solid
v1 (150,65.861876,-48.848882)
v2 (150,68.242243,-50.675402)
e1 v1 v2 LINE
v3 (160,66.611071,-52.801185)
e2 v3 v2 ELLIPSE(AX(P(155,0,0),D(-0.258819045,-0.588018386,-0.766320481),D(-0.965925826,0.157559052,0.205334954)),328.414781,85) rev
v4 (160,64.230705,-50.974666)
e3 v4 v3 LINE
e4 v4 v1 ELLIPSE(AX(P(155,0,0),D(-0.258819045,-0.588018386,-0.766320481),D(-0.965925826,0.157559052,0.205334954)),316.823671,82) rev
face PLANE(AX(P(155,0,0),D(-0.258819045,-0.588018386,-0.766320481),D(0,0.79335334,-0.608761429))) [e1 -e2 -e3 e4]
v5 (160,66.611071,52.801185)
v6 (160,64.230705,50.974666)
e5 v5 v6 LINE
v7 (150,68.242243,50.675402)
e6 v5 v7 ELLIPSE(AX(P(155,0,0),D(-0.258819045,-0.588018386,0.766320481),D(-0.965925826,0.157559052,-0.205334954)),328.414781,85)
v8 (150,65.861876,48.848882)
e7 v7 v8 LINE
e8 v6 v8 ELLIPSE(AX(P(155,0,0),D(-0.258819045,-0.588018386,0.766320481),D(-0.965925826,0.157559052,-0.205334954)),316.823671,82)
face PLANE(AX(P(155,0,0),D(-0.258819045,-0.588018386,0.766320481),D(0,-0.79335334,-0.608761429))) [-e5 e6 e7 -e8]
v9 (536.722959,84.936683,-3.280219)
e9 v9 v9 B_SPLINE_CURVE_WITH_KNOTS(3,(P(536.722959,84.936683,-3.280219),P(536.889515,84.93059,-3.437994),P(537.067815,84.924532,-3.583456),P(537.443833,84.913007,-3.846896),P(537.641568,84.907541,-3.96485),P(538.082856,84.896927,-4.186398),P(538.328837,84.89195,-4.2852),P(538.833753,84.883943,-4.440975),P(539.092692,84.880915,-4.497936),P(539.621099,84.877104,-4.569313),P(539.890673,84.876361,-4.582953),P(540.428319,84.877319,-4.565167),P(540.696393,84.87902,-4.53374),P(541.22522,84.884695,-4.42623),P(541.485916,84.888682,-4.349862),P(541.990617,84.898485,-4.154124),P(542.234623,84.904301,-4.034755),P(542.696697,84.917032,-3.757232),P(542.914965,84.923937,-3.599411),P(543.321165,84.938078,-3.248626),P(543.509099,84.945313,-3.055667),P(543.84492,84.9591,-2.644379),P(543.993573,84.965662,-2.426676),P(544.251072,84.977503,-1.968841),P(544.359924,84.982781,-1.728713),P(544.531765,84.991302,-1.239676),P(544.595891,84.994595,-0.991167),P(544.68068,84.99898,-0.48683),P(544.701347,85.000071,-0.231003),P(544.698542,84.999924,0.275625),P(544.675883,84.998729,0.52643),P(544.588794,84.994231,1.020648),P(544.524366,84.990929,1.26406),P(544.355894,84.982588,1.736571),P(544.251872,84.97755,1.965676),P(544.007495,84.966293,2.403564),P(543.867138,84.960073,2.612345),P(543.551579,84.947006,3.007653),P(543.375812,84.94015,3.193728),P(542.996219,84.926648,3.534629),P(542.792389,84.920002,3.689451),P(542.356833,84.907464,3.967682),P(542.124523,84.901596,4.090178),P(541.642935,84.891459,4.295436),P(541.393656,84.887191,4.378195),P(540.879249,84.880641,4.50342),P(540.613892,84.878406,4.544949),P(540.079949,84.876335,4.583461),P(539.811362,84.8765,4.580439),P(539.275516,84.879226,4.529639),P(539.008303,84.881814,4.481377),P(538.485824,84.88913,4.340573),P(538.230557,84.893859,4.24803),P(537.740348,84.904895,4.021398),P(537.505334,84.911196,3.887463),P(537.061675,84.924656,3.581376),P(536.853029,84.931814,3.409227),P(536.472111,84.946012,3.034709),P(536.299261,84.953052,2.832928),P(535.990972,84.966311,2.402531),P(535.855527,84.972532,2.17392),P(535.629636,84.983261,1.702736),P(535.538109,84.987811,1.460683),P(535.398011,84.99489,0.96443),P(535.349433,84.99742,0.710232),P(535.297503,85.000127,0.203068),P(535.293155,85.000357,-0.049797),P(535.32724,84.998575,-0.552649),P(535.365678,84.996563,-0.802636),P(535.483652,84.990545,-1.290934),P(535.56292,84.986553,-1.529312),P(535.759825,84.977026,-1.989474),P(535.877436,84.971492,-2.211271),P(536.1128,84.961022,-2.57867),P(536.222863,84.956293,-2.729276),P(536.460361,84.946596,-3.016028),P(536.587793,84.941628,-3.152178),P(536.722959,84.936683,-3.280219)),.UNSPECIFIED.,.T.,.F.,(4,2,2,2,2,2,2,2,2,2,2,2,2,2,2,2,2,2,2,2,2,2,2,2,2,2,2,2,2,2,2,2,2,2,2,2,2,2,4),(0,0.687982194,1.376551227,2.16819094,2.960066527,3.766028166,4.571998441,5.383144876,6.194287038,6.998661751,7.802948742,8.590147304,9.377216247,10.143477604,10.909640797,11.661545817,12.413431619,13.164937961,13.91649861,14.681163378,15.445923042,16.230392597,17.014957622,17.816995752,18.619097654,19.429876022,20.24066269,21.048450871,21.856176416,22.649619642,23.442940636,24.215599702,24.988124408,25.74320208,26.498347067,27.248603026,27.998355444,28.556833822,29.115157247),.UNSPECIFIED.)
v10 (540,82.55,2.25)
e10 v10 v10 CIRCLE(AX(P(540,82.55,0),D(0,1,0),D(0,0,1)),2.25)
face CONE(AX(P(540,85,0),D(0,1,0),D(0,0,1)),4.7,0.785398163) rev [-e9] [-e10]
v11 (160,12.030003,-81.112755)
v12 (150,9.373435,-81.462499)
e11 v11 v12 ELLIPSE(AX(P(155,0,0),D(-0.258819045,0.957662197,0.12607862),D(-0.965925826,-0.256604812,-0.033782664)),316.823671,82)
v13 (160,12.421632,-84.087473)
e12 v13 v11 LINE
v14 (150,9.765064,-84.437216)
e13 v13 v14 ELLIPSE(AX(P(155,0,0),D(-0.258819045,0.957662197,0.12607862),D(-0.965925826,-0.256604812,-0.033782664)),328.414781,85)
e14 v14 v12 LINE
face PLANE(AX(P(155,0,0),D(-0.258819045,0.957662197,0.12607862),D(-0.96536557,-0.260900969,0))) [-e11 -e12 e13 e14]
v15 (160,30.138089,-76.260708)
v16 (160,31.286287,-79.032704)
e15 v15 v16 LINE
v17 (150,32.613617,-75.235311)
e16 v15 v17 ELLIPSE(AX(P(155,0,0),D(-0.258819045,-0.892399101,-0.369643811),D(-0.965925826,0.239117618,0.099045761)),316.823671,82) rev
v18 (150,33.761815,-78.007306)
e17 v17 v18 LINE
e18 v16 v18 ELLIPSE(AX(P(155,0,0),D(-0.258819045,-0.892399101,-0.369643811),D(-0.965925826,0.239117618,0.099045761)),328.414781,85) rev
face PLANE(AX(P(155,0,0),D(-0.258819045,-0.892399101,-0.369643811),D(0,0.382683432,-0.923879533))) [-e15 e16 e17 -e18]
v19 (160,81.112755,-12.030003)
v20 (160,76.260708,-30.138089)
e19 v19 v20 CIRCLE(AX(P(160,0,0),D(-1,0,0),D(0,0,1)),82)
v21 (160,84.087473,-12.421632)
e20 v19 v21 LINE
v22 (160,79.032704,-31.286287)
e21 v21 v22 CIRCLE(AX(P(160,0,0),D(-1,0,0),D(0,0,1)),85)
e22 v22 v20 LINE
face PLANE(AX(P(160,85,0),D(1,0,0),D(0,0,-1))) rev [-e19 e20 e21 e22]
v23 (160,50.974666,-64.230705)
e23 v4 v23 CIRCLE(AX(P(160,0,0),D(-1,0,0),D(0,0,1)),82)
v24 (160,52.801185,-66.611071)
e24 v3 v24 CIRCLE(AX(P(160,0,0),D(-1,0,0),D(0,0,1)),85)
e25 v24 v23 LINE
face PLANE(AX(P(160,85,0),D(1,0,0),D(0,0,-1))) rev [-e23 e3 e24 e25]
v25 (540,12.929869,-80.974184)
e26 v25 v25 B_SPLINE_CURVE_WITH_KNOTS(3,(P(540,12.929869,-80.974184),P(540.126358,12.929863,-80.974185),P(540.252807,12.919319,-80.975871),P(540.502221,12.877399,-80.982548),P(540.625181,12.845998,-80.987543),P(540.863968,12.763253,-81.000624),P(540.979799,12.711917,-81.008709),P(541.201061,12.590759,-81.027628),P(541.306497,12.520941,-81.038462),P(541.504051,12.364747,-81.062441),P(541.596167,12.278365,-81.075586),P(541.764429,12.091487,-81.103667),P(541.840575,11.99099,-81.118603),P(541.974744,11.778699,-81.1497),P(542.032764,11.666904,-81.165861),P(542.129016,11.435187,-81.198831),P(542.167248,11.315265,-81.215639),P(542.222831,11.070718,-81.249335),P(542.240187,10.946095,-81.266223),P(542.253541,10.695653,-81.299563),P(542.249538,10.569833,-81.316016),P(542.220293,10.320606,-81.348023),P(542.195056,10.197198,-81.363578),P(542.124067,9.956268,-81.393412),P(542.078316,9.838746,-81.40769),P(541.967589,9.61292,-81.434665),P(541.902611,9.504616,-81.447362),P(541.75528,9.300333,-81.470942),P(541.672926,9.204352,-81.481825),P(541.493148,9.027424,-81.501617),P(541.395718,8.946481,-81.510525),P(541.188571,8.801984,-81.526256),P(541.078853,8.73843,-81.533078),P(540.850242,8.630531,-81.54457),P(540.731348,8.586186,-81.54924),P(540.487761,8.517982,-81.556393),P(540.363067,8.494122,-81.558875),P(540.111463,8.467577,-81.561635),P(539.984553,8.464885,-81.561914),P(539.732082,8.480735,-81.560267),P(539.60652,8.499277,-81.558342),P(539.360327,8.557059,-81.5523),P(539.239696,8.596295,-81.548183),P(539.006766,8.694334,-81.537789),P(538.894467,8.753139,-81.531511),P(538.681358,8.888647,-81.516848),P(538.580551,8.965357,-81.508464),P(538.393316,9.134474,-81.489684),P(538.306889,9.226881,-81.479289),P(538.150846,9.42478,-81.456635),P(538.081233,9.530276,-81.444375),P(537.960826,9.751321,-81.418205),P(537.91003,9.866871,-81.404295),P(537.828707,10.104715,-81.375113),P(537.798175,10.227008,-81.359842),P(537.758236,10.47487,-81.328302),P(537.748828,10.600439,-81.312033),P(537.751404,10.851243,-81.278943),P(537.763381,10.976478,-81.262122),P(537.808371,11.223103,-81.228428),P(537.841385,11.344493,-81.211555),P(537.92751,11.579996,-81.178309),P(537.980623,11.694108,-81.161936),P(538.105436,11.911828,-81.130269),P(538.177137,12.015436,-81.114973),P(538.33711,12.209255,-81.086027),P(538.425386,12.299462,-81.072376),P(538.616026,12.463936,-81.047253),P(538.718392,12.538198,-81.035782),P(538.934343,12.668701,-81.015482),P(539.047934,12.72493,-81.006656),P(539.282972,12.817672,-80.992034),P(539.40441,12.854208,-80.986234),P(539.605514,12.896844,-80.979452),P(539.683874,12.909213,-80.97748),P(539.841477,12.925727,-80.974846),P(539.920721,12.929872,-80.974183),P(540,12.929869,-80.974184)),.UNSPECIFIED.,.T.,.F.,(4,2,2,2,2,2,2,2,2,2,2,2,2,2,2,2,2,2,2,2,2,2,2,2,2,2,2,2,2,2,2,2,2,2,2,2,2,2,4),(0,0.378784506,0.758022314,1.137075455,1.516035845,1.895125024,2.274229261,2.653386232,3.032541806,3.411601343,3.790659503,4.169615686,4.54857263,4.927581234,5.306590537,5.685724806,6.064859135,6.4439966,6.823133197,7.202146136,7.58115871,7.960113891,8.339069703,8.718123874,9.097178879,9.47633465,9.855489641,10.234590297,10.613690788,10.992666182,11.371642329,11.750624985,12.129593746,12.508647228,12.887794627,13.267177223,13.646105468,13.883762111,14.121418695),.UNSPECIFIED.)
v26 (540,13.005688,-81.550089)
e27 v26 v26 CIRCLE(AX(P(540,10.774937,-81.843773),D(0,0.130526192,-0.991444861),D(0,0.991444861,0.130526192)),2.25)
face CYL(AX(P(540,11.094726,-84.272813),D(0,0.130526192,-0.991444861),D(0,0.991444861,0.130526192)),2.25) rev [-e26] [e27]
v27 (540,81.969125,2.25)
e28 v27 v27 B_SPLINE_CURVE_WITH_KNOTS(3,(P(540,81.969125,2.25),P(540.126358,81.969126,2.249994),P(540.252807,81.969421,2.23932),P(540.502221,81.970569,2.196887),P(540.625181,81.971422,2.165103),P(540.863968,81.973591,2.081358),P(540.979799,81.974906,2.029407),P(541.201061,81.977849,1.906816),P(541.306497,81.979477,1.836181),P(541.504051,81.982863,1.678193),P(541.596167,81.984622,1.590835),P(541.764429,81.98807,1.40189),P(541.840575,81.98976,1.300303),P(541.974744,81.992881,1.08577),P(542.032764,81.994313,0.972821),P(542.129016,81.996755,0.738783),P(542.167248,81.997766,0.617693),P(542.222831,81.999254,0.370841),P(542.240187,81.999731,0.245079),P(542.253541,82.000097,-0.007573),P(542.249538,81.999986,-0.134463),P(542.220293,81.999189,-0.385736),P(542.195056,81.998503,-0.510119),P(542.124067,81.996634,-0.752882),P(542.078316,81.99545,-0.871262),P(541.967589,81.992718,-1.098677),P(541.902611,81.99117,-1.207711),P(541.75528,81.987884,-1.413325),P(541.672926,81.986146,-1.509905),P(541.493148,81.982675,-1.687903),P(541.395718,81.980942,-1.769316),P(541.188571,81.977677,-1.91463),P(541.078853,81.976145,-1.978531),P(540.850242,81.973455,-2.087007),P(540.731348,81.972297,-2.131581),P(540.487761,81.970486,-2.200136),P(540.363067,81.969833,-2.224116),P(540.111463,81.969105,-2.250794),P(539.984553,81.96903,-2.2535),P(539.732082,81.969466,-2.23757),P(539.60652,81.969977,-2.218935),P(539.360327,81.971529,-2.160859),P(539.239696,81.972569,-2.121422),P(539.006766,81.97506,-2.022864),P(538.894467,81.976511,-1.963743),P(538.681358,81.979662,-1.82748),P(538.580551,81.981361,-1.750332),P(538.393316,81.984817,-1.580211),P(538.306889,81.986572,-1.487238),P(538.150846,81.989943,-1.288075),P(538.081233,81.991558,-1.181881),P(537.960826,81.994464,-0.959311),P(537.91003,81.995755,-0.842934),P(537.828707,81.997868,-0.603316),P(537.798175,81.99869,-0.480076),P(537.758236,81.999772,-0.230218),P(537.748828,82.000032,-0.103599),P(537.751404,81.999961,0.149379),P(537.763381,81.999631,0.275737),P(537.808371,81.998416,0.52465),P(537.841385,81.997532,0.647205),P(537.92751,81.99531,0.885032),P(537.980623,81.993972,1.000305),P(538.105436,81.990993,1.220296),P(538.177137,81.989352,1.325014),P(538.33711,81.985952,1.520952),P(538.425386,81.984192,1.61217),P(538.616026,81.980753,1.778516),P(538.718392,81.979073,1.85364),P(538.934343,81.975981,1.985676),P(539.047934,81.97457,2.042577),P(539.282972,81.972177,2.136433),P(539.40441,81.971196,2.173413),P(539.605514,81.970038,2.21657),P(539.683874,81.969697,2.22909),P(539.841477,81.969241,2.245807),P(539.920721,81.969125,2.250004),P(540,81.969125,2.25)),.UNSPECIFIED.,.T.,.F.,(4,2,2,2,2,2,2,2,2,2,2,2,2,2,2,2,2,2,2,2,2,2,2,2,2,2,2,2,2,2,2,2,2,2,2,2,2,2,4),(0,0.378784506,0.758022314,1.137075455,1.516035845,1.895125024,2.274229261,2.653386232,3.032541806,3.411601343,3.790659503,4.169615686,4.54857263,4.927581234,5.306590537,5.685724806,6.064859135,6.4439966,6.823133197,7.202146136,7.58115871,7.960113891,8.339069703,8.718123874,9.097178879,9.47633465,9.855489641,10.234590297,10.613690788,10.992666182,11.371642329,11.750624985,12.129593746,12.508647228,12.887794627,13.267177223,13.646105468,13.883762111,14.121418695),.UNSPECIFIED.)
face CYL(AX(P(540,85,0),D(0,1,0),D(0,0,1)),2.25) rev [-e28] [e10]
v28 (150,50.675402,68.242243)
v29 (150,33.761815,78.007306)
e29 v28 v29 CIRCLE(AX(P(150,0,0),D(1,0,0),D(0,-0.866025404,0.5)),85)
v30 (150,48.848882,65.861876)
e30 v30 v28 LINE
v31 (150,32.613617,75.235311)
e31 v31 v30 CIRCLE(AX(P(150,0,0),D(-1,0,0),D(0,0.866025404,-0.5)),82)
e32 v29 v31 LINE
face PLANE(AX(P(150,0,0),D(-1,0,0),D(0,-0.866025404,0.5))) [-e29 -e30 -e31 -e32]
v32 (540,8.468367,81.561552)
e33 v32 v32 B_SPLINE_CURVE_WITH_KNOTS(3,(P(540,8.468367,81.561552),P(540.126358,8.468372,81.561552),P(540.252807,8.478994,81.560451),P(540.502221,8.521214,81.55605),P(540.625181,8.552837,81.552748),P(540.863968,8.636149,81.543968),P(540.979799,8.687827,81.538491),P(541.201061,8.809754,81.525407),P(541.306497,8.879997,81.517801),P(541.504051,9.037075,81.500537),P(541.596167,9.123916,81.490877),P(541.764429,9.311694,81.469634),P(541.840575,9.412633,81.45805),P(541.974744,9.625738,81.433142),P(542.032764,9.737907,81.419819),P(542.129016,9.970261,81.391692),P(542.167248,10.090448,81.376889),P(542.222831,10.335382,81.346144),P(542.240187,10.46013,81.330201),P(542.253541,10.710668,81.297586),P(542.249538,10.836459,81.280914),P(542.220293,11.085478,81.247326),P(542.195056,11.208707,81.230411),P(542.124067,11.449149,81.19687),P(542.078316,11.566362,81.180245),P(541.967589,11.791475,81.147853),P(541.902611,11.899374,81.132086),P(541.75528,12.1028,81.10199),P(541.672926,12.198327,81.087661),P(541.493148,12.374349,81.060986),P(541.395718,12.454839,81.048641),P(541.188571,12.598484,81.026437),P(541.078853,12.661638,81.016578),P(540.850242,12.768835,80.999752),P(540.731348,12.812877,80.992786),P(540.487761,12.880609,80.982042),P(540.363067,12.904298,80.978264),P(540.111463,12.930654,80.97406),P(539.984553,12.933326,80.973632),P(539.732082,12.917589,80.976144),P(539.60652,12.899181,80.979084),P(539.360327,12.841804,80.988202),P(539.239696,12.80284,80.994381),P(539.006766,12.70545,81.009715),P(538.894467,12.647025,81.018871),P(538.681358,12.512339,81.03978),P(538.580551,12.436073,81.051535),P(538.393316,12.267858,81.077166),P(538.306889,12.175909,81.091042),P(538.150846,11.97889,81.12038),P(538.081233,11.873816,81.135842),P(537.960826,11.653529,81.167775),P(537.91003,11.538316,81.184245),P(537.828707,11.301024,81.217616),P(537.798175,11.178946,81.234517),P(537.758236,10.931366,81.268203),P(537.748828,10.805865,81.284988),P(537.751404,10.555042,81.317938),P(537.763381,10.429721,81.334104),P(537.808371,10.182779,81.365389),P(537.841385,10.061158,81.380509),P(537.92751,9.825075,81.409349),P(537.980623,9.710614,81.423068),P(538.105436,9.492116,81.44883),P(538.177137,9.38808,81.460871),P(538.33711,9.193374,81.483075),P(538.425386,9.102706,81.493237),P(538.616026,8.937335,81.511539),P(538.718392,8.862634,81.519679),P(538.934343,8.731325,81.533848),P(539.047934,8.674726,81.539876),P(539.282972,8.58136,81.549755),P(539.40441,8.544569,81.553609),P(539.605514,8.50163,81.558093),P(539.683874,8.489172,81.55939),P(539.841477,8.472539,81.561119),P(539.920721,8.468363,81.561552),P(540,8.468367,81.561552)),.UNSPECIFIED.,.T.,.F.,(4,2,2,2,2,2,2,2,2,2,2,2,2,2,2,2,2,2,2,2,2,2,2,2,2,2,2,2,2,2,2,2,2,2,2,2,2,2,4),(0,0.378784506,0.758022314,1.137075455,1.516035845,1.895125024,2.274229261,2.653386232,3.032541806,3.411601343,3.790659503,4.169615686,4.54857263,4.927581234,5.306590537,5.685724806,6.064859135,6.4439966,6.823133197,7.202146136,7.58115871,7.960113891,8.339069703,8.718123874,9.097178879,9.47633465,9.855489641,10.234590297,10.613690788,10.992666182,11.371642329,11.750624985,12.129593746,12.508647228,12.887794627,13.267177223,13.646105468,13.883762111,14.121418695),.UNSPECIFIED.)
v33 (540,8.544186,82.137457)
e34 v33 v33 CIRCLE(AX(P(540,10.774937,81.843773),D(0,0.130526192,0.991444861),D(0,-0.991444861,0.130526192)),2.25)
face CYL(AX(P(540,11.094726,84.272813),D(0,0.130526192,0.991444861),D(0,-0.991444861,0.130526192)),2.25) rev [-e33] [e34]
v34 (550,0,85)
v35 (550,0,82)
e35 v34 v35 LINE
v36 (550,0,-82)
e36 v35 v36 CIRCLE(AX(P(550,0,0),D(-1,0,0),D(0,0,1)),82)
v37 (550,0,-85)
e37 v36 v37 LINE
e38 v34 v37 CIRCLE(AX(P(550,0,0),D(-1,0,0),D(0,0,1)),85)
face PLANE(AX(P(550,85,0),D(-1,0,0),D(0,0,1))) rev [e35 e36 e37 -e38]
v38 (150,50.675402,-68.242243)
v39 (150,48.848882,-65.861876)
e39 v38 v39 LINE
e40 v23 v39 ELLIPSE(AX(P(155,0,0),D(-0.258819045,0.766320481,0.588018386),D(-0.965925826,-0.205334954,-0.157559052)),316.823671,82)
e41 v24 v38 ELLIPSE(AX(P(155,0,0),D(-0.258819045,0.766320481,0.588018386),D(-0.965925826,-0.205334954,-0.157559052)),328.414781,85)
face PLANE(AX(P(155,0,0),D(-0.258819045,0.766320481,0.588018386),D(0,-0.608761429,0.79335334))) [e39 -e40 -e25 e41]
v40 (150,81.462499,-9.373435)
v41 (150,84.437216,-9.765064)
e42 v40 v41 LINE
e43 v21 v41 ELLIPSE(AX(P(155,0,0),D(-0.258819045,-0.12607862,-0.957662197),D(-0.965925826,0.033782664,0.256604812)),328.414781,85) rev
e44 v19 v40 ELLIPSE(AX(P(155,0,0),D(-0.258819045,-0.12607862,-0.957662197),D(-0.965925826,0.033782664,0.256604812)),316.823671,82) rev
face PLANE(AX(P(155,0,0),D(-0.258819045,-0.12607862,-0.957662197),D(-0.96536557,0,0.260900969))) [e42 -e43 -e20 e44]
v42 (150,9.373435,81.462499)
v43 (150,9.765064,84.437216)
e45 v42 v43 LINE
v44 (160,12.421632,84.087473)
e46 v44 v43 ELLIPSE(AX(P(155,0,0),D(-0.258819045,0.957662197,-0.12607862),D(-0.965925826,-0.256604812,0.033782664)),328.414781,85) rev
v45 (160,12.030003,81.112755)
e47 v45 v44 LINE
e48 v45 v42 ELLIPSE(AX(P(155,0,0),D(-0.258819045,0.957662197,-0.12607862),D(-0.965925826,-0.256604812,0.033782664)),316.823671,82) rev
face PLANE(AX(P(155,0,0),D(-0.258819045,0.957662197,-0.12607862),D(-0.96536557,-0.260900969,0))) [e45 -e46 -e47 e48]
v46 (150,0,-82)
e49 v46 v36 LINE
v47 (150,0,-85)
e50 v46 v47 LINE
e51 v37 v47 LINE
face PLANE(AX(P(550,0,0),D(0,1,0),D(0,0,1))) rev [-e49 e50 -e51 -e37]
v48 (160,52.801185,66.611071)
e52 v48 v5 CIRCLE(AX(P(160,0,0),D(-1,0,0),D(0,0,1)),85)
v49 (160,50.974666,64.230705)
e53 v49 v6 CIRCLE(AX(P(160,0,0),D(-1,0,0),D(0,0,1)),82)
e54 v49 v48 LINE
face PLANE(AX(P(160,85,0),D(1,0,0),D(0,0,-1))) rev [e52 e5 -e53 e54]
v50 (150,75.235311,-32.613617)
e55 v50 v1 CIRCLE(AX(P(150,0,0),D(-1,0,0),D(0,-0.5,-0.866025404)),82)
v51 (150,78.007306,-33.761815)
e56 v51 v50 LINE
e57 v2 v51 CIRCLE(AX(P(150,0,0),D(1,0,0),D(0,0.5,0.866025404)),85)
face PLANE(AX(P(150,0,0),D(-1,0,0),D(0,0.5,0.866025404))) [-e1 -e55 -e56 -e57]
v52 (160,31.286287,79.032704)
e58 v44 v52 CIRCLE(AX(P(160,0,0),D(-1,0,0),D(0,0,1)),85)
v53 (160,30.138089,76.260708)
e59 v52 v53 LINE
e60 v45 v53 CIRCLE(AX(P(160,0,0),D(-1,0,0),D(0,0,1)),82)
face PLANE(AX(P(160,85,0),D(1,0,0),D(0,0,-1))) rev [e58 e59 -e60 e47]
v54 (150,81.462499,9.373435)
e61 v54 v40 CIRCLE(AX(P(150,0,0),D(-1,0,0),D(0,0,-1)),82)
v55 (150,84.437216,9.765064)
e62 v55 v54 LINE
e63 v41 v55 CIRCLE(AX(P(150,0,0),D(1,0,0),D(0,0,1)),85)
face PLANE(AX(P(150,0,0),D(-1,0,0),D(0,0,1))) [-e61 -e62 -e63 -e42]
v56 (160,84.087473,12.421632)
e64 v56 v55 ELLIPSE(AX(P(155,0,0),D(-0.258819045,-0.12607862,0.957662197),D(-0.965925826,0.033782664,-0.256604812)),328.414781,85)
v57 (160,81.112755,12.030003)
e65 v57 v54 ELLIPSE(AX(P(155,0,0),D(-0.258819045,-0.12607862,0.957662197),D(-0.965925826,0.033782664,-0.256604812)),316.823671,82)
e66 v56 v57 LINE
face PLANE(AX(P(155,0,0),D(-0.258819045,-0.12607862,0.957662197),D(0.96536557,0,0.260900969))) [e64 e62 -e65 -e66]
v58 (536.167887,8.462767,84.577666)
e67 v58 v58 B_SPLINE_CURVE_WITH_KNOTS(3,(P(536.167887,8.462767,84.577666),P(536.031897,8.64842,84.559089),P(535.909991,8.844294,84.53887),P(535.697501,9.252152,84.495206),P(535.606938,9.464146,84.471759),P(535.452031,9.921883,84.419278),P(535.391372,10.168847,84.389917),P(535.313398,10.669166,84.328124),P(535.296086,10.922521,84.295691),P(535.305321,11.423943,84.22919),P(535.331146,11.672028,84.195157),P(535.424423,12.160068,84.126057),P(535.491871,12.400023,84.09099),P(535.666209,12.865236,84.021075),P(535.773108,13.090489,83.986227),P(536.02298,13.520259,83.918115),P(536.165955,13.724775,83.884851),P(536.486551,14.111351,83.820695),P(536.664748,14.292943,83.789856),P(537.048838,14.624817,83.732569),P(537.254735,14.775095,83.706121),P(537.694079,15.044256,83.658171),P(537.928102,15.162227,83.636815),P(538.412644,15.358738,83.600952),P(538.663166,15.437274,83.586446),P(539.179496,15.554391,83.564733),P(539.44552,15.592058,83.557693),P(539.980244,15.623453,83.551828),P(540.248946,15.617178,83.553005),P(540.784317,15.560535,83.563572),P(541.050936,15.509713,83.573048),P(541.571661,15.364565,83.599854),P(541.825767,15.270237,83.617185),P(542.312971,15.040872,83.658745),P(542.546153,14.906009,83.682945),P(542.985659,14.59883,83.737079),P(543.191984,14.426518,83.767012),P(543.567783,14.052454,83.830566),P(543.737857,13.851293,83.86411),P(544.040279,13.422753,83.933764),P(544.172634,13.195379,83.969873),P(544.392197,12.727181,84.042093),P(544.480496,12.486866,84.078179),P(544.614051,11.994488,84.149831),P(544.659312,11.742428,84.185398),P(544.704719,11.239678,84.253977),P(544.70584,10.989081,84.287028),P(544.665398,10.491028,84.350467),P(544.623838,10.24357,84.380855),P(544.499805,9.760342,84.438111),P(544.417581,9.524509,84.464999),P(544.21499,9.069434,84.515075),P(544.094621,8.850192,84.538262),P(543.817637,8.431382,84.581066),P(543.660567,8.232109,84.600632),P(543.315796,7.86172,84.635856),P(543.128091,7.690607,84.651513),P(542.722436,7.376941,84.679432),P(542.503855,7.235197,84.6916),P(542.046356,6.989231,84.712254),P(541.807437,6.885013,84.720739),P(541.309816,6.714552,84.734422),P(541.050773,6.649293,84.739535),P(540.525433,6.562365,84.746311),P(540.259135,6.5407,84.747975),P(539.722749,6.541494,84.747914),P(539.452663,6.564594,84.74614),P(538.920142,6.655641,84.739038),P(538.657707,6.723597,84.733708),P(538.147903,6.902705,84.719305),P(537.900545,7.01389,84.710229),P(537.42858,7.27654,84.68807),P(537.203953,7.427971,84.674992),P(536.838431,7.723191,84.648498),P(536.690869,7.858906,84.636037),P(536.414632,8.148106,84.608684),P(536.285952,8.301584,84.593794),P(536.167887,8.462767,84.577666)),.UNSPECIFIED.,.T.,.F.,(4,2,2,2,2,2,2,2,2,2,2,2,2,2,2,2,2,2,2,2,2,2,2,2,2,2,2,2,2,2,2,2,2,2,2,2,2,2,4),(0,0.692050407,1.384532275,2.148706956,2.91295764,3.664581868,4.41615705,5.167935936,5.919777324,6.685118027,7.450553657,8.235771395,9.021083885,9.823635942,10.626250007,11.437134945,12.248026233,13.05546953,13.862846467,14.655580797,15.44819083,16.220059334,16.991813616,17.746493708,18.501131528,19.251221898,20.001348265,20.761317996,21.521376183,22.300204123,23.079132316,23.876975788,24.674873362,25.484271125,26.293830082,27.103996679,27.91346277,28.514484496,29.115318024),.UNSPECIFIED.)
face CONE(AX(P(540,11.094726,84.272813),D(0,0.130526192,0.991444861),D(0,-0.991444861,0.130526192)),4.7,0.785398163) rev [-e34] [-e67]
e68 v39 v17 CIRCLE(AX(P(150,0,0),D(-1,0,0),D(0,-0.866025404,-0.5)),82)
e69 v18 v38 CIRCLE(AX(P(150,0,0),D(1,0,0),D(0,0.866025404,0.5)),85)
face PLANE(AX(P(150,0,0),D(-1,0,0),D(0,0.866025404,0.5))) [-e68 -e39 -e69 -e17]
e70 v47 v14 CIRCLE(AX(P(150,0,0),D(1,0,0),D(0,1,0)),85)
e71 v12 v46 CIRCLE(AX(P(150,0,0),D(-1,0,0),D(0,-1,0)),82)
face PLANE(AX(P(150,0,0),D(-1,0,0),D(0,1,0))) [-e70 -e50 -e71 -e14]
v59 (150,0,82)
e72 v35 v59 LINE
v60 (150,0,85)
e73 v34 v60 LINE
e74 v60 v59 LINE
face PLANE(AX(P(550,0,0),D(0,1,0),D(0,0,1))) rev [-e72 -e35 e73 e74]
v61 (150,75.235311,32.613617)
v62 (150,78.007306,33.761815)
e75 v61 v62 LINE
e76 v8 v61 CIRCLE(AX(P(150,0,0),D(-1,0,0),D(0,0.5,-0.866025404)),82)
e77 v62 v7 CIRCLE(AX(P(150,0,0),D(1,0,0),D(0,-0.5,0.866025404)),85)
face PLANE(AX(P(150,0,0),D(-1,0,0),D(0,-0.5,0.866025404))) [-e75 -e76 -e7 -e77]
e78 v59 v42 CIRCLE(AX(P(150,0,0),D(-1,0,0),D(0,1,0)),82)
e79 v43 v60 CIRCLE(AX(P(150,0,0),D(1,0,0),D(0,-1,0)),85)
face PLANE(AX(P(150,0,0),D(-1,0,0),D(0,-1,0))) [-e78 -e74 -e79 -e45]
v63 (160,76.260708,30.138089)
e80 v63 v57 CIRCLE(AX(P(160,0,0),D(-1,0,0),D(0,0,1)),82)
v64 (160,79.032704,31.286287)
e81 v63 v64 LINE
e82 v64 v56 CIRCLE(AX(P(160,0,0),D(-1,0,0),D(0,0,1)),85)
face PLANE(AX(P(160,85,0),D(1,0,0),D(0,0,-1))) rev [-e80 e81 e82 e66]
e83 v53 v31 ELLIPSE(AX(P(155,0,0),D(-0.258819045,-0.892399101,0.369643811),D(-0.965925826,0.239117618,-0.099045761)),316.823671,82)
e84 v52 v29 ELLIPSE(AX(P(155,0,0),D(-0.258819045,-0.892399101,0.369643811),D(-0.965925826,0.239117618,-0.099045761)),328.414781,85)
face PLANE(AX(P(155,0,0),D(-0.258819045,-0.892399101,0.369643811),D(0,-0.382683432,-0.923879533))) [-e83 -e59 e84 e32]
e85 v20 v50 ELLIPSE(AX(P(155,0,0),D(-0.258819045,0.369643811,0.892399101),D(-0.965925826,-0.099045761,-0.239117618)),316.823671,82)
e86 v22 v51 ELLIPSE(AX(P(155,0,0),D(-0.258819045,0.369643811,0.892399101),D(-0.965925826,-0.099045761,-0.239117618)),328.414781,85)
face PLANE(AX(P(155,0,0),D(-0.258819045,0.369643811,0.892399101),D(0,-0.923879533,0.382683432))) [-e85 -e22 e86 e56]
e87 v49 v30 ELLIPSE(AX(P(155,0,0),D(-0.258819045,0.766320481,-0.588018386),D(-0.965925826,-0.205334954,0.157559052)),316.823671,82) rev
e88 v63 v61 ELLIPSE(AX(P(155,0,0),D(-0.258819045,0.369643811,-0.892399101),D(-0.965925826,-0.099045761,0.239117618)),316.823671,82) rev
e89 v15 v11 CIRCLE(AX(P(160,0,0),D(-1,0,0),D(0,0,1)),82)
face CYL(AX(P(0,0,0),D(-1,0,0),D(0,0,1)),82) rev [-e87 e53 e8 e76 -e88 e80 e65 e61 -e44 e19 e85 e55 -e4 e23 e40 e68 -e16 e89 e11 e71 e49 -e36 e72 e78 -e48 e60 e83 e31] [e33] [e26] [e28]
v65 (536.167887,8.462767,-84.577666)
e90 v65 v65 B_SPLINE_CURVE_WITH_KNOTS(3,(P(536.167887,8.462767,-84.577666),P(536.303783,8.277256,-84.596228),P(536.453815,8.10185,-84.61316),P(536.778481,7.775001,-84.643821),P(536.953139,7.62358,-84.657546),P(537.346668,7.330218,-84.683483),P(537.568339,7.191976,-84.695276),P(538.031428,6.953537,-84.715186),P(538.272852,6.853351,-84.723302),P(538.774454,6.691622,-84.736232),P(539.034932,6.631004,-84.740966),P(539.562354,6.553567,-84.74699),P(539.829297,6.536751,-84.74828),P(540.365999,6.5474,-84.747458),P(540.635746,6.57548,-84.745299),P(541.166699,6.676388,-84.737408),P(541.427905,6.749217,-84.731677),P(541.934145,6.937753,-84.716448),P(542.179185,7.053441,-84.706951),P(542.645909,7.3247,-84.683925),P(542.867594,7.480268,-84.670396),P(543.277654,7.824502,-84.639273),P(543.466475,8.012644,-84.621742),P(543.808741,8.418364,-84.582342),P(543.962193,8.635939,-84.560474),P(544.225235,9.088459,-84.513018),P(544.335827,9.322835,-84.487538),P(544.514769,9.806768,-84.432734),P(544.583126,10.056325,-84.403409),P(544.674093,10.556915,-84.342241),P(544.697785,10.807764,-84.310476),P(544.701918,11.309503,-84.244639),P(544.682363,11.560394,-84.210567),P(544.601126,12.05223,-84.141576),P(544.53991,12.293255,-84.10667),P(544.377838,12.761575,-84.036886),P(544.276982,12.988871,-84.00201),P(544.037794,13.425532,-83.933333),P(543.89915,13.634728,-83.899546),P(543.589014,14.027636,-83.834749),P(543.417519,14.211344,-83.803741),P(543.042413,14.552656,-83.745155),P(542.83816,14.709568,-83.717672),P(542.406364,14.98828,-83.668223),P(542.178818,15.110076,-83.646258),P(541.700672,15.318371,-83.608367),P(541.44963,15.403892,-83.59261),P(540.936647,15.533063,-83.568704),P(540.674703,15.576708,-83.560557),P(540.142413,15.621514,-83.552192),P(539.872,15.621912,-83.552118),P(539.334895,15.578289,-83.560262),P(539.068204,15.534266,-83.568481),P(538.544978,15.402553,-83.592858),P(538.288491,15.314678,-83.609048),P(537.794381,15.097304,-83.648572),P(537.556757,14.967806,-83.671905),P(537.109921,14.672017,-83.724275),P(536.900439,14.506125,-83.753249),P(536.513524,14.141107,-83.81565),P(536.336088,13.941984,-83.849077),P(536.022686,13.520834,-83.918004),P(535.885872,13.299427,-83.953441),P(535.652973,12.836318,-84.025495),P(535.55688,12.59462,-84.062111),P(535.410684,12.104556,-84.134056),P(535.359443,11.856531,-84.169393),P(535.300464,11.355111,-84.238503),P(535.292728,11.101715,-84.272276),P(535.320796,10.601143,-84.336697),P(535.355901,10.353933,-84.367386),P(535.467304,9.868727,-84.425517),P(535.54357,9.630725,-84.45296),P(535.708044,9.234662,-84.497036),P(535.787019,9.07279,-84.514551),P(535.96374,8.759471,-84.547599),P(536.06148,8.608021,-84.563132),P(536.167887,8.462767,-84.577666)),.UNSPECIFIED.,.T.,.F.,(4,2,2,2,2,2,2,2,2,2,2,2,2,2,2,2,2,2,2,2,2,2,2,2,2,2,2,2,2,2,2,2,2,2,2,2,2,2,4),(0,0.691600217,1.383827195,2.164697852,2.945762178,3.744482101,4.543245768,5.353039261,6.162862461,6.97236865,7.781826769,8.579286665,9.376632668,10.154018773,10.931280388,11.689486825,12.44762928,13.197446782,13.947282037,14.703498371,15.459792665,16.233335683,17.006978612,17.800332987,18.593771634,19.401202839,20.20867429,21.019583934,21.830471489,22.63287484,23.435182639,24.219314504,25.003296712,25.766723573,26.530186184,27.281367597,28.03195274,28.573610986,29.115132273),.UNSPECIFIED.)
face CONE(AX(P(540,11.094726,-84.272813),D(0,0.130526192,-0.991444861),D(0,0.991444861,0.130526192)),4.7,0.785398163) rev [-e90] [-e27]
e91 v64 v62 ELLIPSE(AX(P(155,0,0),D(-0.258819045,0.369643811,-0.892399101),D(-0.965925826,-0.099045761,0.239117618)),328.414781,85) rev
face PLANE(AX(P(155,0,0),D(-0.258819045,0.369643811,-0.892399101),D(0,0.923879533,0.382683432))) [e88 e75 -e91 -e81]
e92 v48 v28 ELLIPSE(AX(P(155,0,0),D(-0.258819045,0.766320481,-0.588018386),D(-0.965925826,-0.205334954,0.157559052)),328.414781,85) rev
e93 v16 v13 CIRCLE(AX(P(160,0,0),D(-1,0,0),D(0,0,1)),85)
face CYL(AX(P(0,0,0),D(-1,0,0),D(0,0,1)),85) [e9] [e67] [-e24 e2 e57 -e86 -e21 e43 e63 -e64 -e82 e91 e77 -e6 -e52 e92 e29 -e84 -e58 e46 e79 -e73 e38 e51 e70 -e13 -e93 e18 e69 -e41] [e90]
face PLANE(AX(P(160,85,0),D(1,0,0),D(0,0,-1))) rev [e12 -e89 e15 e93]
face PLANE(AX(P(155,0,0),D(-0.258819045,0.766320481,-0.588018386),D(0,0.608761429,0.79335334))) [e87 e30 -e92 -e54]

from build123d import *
from build123d.topology import SkipClean

# Parameters (mm, degrees)
SKETCH1_W                      = 390
SKETCH1_H                      = 3
BOSS_EXTRUDE1_DEPTH            = 5
DRAFT1_ANGLE                   = -15
CIRPATTERN1_COUNT              = 12
DRAFT1_OF_CIRPATTERN1_2_ANGLE  = -15
DRAFT1_OF_CIRPATTERN1_3_ANGLE  = -15
DRAFT1_OF_CIRPATTERN1_4_ANGLE  = -15
DRAFT1_OF_CIRPATTERN1_5_ANGLE  = -15
DRAFT1_OF_CIRPATTERN1_6_ANGLE  = -15
DRAFT1_OF_CIRPATTERN1_7_ANGLE  = -15
DRAFT1_OF_CIRPATTERN1_8_ANGLE  = -15
DRAFT1_OF_CIRPATTERN1_9_ANGLE  = -15
DRAFT1_OF_CIRPATTERN1_10_ANGLE = -15
DRAFT1_OF_CIRPATTERN1_11_ANGLE = -15
DRAFT1_OF_CIRPATTERN1_12_ANGLE = -15
SKETCH3_OUTSIDE_W              = 265.338
SKETCH3_OUTSIDE_H              = 265.338
CUT_EXTRUDE1_DEPTH             = 563.983125857


# Read off the part's stored shape, not the designer's step: CSK for M4 Countersunk Flat Head Screw1
with BuildPart() as part:
    # Sketch1 → Revolve1 (revolve)
    with BuildSketch(Plane.XY, mode=Mode.PRIVATE) as revolve1_sk:
        with Locations((355, 83.5)):
            Rectangle(SKETCH1_W, SKETCH1_H)
    revolve(revolve1_sk.sketch.rotate(Axis((0, 0, 0), (1, 0, 0)), 90), axis=Axis((0, 0, 0), (1, 0, 0)))

    # Sketch2 → Boss-Extrude1 (add, symmetric)
    with BuildSketch(Plane(origin=(155, 0, 0), x_dir=(0, 0, -1), z_dir=(1, 0, 0))):
        with BuildLine():
            Line((10.703147762, 81.298478633), (11.094726339, 84.272813217))
            ThreePointArc((11.094726339, 84.272813217), (0, 85), (-11.094726339, 84.272813217))
            Line((-11.094726339, 84.272813217), (-10.703147762, 81.298478633))
            ThreePointArc((-10.703147762, 81.298478633), (0, 82), (10.703147762, 81.298478633))
        make_face()
    boss_extrude1 = extrude(amount=BOSS_EXTRUDE1_DEPTH, both=True)

    # Draft1
    draft1_faces = [part.faces().sort_by_distance(p)[0] for p in [
        (155, 82.785645925, 10.89893705),
        (155, 82.785645925, -10.89893705),
    ]]
    draft(draft1_faces, Plane(origin=(155, 0, 0), x_dir=(0, 0, 1), z_dir=(1, 0, 0)), DRAFT1_ANGLE)

    # CirPattern1: Boss-Extrude1 ×12 about axis
    with SkipClean():  # the faces are left unmerged after this step: merging them gives an invalid solid
        cirpattern1_axis = Axis((0, 0, 0), (1, 0, 0))
        for i in range(1, CIRPATTERN1_COUNT):
            add(boss_extrude1.rotate(cirpattern1_axis, i * 360 / CIRPATTERN1_COUNT))

    # Draft1 of CirPattern1 2
    draft1_of_cirpattern1_2_faces = [part.faces().sort_by_distance(p)[0] for p in [
        (155, 66.245003914, 50.831579322),
        (155, 77.143940965, 31.954066602),
    ]]
    draft(draft1_of_cirpattern1_2_faces, Plane(origin=(155, 0, 0), x_dir=(0, -0.49999999999999994, 0.8660254037844387), z_dir=(1, 0, 0)), DRAFT1_OF_CIRPATTERN1_2_ANGLE)

    # Draft1 of CirPattern1 3
    draft1_of_cirpattern1_3_faces = [part.faces().sort_by_distance(p)[0] for p in [
        (155, 31.954066602, 77.143940965),
        (155, 50.831579322, 66.245003914),
    ]]
    draft(draft1_of_cirpattern1_3_faces, Plane(origin=(155, 0, 0), x_dir=(0, -0.8660254037844386, 0.5000000000000001), z_dir=(1, 0, 0)), DRAFT1_OF_CIRPATTERN1_3_ANGLE)

    # Draft1 of CirPattern1 4
    draft1_of_cirpattern1_4_faces = [part.faces().sort_by_distance(p)[0] for p in [
        (155, -10.89893705, 82.785645925),
        (155, 10.89893705, 82.785645925),
    ]]
    draft(draft1_of_cirpattern1_4_faces, Plane(origin=(155, 0, 0), x_dir=(0, -1, 0), z_dir=(1, 0, 0)), DRAFT1_OF_CIRPATTERN1_4_ANGLE)

    # Draft1 of CirPattern1 5
    draft1_of_cirpattern1_5_faces = [part.faces().sort_by_distance(p)[0] for p in [
        (155, -50.831579322, 66.245003914),
        (155, -31.954066602, 77.143940965),
    ]]
    draft(draft1_of_cirpattern1_5_faces, Plane(origin=(155, 0, 0), x_dir=(0, -0.8660254037844387, -0.4999999999999998), z_dir=(1, 0, 0)), DRAFT1_OF_CIRPATTERN1_5_ANGLE)

    # Draft1 of CirPattern1 6
    draft1_of_cirpattern1_6_faces = [part.faces().sort_by_distance(p)[0] for p in [
        (155, -77.143940965, 31.954066602),
        (155, -66.245003914, 50.831579322),
    ]]
    draft(draft1_of_cirpattern1_6_faces, Plane(origin=(155, 0, 0), x_dir=(0, -0.49999999999999994, -0.8660254037844387), z_dir=(1, 0, 0)), DRAFT1_OF_CIRPATTERN1_6_ANGLE)

    # Draft1 of CirPattern1 7
    draft1_of_cirpattern1_7_faces = [part.faces().sort_by_distance(p)[0] for p in [
        (155, -82.785645925, -10.89893705),
        (155, -82.785645925, 10.89893705),
    ]]
    draft(draft1_of_cirpattern1_7_faces, Plane(origin=(155, 0, 0), x_dir=(0, 0, -1), z_dir=(1, 0, 0)), DRAFT1_OF_CIRPATTERN1_7_ANGLE)

    # Draft1 of CirPattern1 8
    draft1_of_cirpattern1_8_faces = [part.faces().sort_by_distance(p)[0] for p in [
        (155, -66.245003914, -50.831579322),
        (155, -77.143940965, -31.954066602),
    ]]
    draft(draft1_of_cirpattern1_8_faces, Plane(origin=(155, 0, 0), x_dir=(0, 0.5000000000000001, -0.8660254037844386), z_dir=(1, 0, 0)), DRAFT1_OF_CIRPATTERN1_8_ANGLE)

    # Draft1 of CirPattern1 9
    draft1_of_cirpattern1_9_faces = [part.faces().sort_by_distance(p)[0] for p in [
        (155, -31.954066602, -77.143940965),
        (155, -50.831579322, -66.245003914),
    ]]
    draft(draft1_of_cirpattern1_9_faces, Plane(origin=(155, 0, 0), x_dir=(0, 0.8660254037844384, -0.5000000000000004), z_dir=(1, 0, 0)), DRAFT1_OF_CIRPATTERN1_9_ANGLE)

    # Draft1 of CirPattern1 10
    draft1_of_cirpattern1_10_faces = [part.faces().sort_by_distance(p)[0] for p in [
        (155, 10.89893705, -82.785645925),
        (155, -10.89893705, -82.785645925),
    ]]
    draft(draft1_of_cirpattern1_10_faces, Plane.YZ.offset(155), DRAFT1_OF_CIRPATTERN1_10_ANGLE)

    # Draft1 of CirPattern1 11
    draft1_of_cirpattern1_11_faces = [part.faces().sort_by_distance(p)[0] for p in [
        (155, 50.831579322, -66.245003914),
        (155, 31.954066602, -77.143940965),
    ]]
    draft(draft1_of_cirpattern1_11_faces, Plane(origin=(155, 0, 0), x_dir=(0, 0.8660254037844386, 0.5000000000000001), z_dir=(1, 0, 0)), DRAFT1_OF_CIRPATTERN1_11_ANGLE)

    # Draft1 of CirPattern1 12
    draft1_of_cirpattern1_12_faces = [part.faces().sort_by_distance(p)[0] for p in [
        (155, 77.143940965, -31.954066602),
        (155, 66.245003914, -50.831579322),
    ]]
    draft(draft1_of_cirpattern1_12_faces, Plane(origin=(155, 0, 0), x_dir=(0, 0.5000000000000004, 0.8660254037844384), z_dir=(1, 0, 0)), DRAFT1_OF_CIRPATTERN1_12_ANGLE)

    # Sketch3 outside → Cut-Extrude1 (cut, through all)
    with SkipClean():  # the faces are left unmerged after this step: merging them gives an invalid solid
        with BuildSketch(Plane(origin=(0, 0, 0), x_dir=(0, 0, -1), z_dir=(1, 0, 0))):
            Rectangle(SKETCH3_OUTSIDE_W, SKETCH3_OUTSIDE_H)
            with BuildLine():
                Line((0, 0), (-85, 0))
                ThreePointArc((-85, 0), (0, 85), (85, 0))
                Line((85, 0), (0, 0))
            make_face(mode=Mode.SUBTRACT)
        extrude(amount=CUT_EXTRUDE1_DEPTH, mode=Mode.SUBTRACT)

    # CSK for M4 Countersunk Flat Head Scr 2 → CSK for M4 Countersunk Flat Head Screw1 (revolve, cut)
    with SkipClean():  # the faces are left unmerged after this step: merging them gives an invalid solid
        with BuildSketch(Plane(origin=(540, 0, 0), x_dir=(1, 0, 0), z_dir=(0, 0, 1))):
            Polygon((4.700033545, 85.000033545), (0, 85.000033545), (0, 81.96910869), (2.25, 81.96910869), (2.25, 82.55), align=None)
        revolve(axis=Axis((540, 0, 0), (0, 1, 0)), mode=Mode.SUBTRACT)

    # CSK for M4 Countersunk Flat Head Scr 3 o → CSK for M4 Countersunk Flat Head Scr 3 (revolve, cut)
    with SkipClean():  # the faces are left unmerged after this step: merging them gives an invalid solid
        with BuildSketch(Plane(origin=(540, 0, 0), x_dir=(1, 0, 0), z_dir=(0, 0.9914448613738104, 0.13052619222005205))):
            Polygon((4.700071897, 85.000071897), (0, 85.000071897), (0, 81.96910869), (2.25, 81.96910869), (2.25, 82.55), align=None)
        revolve(axis=Axis((540, 0, 0), (0, 0.13052619222005205, -0.9914448613738104)), mode=Mode.SUBTRACT)

    # CSK for M4 Countersunk Flat Head Scr 4 o → CSK for M4 Countersunk Flat Head Scr 4 (revolve, cut)
    with SkipClean():  # the faces are left unmerged after this step: merging them gives an invalid solid
        with BuildSketch(Plane(origin=(540, 0, 0), x_dir=(1, 0, 0), z_dir=(0, -0.9914448613738104, 0.13052619222005205))):
            Polygon((4.700070707, 85.000070707), (0, 85.000070707), (0, 81.96910869), (2.25, 81.96910869), (2.25, 82.55), align=None)
        revolve(axis=Axis((540, 0, 0), (0, 0.13052619222005205, 0.9914448613738104)), mode=Mode.SUBTRACT)


solid = part.part
